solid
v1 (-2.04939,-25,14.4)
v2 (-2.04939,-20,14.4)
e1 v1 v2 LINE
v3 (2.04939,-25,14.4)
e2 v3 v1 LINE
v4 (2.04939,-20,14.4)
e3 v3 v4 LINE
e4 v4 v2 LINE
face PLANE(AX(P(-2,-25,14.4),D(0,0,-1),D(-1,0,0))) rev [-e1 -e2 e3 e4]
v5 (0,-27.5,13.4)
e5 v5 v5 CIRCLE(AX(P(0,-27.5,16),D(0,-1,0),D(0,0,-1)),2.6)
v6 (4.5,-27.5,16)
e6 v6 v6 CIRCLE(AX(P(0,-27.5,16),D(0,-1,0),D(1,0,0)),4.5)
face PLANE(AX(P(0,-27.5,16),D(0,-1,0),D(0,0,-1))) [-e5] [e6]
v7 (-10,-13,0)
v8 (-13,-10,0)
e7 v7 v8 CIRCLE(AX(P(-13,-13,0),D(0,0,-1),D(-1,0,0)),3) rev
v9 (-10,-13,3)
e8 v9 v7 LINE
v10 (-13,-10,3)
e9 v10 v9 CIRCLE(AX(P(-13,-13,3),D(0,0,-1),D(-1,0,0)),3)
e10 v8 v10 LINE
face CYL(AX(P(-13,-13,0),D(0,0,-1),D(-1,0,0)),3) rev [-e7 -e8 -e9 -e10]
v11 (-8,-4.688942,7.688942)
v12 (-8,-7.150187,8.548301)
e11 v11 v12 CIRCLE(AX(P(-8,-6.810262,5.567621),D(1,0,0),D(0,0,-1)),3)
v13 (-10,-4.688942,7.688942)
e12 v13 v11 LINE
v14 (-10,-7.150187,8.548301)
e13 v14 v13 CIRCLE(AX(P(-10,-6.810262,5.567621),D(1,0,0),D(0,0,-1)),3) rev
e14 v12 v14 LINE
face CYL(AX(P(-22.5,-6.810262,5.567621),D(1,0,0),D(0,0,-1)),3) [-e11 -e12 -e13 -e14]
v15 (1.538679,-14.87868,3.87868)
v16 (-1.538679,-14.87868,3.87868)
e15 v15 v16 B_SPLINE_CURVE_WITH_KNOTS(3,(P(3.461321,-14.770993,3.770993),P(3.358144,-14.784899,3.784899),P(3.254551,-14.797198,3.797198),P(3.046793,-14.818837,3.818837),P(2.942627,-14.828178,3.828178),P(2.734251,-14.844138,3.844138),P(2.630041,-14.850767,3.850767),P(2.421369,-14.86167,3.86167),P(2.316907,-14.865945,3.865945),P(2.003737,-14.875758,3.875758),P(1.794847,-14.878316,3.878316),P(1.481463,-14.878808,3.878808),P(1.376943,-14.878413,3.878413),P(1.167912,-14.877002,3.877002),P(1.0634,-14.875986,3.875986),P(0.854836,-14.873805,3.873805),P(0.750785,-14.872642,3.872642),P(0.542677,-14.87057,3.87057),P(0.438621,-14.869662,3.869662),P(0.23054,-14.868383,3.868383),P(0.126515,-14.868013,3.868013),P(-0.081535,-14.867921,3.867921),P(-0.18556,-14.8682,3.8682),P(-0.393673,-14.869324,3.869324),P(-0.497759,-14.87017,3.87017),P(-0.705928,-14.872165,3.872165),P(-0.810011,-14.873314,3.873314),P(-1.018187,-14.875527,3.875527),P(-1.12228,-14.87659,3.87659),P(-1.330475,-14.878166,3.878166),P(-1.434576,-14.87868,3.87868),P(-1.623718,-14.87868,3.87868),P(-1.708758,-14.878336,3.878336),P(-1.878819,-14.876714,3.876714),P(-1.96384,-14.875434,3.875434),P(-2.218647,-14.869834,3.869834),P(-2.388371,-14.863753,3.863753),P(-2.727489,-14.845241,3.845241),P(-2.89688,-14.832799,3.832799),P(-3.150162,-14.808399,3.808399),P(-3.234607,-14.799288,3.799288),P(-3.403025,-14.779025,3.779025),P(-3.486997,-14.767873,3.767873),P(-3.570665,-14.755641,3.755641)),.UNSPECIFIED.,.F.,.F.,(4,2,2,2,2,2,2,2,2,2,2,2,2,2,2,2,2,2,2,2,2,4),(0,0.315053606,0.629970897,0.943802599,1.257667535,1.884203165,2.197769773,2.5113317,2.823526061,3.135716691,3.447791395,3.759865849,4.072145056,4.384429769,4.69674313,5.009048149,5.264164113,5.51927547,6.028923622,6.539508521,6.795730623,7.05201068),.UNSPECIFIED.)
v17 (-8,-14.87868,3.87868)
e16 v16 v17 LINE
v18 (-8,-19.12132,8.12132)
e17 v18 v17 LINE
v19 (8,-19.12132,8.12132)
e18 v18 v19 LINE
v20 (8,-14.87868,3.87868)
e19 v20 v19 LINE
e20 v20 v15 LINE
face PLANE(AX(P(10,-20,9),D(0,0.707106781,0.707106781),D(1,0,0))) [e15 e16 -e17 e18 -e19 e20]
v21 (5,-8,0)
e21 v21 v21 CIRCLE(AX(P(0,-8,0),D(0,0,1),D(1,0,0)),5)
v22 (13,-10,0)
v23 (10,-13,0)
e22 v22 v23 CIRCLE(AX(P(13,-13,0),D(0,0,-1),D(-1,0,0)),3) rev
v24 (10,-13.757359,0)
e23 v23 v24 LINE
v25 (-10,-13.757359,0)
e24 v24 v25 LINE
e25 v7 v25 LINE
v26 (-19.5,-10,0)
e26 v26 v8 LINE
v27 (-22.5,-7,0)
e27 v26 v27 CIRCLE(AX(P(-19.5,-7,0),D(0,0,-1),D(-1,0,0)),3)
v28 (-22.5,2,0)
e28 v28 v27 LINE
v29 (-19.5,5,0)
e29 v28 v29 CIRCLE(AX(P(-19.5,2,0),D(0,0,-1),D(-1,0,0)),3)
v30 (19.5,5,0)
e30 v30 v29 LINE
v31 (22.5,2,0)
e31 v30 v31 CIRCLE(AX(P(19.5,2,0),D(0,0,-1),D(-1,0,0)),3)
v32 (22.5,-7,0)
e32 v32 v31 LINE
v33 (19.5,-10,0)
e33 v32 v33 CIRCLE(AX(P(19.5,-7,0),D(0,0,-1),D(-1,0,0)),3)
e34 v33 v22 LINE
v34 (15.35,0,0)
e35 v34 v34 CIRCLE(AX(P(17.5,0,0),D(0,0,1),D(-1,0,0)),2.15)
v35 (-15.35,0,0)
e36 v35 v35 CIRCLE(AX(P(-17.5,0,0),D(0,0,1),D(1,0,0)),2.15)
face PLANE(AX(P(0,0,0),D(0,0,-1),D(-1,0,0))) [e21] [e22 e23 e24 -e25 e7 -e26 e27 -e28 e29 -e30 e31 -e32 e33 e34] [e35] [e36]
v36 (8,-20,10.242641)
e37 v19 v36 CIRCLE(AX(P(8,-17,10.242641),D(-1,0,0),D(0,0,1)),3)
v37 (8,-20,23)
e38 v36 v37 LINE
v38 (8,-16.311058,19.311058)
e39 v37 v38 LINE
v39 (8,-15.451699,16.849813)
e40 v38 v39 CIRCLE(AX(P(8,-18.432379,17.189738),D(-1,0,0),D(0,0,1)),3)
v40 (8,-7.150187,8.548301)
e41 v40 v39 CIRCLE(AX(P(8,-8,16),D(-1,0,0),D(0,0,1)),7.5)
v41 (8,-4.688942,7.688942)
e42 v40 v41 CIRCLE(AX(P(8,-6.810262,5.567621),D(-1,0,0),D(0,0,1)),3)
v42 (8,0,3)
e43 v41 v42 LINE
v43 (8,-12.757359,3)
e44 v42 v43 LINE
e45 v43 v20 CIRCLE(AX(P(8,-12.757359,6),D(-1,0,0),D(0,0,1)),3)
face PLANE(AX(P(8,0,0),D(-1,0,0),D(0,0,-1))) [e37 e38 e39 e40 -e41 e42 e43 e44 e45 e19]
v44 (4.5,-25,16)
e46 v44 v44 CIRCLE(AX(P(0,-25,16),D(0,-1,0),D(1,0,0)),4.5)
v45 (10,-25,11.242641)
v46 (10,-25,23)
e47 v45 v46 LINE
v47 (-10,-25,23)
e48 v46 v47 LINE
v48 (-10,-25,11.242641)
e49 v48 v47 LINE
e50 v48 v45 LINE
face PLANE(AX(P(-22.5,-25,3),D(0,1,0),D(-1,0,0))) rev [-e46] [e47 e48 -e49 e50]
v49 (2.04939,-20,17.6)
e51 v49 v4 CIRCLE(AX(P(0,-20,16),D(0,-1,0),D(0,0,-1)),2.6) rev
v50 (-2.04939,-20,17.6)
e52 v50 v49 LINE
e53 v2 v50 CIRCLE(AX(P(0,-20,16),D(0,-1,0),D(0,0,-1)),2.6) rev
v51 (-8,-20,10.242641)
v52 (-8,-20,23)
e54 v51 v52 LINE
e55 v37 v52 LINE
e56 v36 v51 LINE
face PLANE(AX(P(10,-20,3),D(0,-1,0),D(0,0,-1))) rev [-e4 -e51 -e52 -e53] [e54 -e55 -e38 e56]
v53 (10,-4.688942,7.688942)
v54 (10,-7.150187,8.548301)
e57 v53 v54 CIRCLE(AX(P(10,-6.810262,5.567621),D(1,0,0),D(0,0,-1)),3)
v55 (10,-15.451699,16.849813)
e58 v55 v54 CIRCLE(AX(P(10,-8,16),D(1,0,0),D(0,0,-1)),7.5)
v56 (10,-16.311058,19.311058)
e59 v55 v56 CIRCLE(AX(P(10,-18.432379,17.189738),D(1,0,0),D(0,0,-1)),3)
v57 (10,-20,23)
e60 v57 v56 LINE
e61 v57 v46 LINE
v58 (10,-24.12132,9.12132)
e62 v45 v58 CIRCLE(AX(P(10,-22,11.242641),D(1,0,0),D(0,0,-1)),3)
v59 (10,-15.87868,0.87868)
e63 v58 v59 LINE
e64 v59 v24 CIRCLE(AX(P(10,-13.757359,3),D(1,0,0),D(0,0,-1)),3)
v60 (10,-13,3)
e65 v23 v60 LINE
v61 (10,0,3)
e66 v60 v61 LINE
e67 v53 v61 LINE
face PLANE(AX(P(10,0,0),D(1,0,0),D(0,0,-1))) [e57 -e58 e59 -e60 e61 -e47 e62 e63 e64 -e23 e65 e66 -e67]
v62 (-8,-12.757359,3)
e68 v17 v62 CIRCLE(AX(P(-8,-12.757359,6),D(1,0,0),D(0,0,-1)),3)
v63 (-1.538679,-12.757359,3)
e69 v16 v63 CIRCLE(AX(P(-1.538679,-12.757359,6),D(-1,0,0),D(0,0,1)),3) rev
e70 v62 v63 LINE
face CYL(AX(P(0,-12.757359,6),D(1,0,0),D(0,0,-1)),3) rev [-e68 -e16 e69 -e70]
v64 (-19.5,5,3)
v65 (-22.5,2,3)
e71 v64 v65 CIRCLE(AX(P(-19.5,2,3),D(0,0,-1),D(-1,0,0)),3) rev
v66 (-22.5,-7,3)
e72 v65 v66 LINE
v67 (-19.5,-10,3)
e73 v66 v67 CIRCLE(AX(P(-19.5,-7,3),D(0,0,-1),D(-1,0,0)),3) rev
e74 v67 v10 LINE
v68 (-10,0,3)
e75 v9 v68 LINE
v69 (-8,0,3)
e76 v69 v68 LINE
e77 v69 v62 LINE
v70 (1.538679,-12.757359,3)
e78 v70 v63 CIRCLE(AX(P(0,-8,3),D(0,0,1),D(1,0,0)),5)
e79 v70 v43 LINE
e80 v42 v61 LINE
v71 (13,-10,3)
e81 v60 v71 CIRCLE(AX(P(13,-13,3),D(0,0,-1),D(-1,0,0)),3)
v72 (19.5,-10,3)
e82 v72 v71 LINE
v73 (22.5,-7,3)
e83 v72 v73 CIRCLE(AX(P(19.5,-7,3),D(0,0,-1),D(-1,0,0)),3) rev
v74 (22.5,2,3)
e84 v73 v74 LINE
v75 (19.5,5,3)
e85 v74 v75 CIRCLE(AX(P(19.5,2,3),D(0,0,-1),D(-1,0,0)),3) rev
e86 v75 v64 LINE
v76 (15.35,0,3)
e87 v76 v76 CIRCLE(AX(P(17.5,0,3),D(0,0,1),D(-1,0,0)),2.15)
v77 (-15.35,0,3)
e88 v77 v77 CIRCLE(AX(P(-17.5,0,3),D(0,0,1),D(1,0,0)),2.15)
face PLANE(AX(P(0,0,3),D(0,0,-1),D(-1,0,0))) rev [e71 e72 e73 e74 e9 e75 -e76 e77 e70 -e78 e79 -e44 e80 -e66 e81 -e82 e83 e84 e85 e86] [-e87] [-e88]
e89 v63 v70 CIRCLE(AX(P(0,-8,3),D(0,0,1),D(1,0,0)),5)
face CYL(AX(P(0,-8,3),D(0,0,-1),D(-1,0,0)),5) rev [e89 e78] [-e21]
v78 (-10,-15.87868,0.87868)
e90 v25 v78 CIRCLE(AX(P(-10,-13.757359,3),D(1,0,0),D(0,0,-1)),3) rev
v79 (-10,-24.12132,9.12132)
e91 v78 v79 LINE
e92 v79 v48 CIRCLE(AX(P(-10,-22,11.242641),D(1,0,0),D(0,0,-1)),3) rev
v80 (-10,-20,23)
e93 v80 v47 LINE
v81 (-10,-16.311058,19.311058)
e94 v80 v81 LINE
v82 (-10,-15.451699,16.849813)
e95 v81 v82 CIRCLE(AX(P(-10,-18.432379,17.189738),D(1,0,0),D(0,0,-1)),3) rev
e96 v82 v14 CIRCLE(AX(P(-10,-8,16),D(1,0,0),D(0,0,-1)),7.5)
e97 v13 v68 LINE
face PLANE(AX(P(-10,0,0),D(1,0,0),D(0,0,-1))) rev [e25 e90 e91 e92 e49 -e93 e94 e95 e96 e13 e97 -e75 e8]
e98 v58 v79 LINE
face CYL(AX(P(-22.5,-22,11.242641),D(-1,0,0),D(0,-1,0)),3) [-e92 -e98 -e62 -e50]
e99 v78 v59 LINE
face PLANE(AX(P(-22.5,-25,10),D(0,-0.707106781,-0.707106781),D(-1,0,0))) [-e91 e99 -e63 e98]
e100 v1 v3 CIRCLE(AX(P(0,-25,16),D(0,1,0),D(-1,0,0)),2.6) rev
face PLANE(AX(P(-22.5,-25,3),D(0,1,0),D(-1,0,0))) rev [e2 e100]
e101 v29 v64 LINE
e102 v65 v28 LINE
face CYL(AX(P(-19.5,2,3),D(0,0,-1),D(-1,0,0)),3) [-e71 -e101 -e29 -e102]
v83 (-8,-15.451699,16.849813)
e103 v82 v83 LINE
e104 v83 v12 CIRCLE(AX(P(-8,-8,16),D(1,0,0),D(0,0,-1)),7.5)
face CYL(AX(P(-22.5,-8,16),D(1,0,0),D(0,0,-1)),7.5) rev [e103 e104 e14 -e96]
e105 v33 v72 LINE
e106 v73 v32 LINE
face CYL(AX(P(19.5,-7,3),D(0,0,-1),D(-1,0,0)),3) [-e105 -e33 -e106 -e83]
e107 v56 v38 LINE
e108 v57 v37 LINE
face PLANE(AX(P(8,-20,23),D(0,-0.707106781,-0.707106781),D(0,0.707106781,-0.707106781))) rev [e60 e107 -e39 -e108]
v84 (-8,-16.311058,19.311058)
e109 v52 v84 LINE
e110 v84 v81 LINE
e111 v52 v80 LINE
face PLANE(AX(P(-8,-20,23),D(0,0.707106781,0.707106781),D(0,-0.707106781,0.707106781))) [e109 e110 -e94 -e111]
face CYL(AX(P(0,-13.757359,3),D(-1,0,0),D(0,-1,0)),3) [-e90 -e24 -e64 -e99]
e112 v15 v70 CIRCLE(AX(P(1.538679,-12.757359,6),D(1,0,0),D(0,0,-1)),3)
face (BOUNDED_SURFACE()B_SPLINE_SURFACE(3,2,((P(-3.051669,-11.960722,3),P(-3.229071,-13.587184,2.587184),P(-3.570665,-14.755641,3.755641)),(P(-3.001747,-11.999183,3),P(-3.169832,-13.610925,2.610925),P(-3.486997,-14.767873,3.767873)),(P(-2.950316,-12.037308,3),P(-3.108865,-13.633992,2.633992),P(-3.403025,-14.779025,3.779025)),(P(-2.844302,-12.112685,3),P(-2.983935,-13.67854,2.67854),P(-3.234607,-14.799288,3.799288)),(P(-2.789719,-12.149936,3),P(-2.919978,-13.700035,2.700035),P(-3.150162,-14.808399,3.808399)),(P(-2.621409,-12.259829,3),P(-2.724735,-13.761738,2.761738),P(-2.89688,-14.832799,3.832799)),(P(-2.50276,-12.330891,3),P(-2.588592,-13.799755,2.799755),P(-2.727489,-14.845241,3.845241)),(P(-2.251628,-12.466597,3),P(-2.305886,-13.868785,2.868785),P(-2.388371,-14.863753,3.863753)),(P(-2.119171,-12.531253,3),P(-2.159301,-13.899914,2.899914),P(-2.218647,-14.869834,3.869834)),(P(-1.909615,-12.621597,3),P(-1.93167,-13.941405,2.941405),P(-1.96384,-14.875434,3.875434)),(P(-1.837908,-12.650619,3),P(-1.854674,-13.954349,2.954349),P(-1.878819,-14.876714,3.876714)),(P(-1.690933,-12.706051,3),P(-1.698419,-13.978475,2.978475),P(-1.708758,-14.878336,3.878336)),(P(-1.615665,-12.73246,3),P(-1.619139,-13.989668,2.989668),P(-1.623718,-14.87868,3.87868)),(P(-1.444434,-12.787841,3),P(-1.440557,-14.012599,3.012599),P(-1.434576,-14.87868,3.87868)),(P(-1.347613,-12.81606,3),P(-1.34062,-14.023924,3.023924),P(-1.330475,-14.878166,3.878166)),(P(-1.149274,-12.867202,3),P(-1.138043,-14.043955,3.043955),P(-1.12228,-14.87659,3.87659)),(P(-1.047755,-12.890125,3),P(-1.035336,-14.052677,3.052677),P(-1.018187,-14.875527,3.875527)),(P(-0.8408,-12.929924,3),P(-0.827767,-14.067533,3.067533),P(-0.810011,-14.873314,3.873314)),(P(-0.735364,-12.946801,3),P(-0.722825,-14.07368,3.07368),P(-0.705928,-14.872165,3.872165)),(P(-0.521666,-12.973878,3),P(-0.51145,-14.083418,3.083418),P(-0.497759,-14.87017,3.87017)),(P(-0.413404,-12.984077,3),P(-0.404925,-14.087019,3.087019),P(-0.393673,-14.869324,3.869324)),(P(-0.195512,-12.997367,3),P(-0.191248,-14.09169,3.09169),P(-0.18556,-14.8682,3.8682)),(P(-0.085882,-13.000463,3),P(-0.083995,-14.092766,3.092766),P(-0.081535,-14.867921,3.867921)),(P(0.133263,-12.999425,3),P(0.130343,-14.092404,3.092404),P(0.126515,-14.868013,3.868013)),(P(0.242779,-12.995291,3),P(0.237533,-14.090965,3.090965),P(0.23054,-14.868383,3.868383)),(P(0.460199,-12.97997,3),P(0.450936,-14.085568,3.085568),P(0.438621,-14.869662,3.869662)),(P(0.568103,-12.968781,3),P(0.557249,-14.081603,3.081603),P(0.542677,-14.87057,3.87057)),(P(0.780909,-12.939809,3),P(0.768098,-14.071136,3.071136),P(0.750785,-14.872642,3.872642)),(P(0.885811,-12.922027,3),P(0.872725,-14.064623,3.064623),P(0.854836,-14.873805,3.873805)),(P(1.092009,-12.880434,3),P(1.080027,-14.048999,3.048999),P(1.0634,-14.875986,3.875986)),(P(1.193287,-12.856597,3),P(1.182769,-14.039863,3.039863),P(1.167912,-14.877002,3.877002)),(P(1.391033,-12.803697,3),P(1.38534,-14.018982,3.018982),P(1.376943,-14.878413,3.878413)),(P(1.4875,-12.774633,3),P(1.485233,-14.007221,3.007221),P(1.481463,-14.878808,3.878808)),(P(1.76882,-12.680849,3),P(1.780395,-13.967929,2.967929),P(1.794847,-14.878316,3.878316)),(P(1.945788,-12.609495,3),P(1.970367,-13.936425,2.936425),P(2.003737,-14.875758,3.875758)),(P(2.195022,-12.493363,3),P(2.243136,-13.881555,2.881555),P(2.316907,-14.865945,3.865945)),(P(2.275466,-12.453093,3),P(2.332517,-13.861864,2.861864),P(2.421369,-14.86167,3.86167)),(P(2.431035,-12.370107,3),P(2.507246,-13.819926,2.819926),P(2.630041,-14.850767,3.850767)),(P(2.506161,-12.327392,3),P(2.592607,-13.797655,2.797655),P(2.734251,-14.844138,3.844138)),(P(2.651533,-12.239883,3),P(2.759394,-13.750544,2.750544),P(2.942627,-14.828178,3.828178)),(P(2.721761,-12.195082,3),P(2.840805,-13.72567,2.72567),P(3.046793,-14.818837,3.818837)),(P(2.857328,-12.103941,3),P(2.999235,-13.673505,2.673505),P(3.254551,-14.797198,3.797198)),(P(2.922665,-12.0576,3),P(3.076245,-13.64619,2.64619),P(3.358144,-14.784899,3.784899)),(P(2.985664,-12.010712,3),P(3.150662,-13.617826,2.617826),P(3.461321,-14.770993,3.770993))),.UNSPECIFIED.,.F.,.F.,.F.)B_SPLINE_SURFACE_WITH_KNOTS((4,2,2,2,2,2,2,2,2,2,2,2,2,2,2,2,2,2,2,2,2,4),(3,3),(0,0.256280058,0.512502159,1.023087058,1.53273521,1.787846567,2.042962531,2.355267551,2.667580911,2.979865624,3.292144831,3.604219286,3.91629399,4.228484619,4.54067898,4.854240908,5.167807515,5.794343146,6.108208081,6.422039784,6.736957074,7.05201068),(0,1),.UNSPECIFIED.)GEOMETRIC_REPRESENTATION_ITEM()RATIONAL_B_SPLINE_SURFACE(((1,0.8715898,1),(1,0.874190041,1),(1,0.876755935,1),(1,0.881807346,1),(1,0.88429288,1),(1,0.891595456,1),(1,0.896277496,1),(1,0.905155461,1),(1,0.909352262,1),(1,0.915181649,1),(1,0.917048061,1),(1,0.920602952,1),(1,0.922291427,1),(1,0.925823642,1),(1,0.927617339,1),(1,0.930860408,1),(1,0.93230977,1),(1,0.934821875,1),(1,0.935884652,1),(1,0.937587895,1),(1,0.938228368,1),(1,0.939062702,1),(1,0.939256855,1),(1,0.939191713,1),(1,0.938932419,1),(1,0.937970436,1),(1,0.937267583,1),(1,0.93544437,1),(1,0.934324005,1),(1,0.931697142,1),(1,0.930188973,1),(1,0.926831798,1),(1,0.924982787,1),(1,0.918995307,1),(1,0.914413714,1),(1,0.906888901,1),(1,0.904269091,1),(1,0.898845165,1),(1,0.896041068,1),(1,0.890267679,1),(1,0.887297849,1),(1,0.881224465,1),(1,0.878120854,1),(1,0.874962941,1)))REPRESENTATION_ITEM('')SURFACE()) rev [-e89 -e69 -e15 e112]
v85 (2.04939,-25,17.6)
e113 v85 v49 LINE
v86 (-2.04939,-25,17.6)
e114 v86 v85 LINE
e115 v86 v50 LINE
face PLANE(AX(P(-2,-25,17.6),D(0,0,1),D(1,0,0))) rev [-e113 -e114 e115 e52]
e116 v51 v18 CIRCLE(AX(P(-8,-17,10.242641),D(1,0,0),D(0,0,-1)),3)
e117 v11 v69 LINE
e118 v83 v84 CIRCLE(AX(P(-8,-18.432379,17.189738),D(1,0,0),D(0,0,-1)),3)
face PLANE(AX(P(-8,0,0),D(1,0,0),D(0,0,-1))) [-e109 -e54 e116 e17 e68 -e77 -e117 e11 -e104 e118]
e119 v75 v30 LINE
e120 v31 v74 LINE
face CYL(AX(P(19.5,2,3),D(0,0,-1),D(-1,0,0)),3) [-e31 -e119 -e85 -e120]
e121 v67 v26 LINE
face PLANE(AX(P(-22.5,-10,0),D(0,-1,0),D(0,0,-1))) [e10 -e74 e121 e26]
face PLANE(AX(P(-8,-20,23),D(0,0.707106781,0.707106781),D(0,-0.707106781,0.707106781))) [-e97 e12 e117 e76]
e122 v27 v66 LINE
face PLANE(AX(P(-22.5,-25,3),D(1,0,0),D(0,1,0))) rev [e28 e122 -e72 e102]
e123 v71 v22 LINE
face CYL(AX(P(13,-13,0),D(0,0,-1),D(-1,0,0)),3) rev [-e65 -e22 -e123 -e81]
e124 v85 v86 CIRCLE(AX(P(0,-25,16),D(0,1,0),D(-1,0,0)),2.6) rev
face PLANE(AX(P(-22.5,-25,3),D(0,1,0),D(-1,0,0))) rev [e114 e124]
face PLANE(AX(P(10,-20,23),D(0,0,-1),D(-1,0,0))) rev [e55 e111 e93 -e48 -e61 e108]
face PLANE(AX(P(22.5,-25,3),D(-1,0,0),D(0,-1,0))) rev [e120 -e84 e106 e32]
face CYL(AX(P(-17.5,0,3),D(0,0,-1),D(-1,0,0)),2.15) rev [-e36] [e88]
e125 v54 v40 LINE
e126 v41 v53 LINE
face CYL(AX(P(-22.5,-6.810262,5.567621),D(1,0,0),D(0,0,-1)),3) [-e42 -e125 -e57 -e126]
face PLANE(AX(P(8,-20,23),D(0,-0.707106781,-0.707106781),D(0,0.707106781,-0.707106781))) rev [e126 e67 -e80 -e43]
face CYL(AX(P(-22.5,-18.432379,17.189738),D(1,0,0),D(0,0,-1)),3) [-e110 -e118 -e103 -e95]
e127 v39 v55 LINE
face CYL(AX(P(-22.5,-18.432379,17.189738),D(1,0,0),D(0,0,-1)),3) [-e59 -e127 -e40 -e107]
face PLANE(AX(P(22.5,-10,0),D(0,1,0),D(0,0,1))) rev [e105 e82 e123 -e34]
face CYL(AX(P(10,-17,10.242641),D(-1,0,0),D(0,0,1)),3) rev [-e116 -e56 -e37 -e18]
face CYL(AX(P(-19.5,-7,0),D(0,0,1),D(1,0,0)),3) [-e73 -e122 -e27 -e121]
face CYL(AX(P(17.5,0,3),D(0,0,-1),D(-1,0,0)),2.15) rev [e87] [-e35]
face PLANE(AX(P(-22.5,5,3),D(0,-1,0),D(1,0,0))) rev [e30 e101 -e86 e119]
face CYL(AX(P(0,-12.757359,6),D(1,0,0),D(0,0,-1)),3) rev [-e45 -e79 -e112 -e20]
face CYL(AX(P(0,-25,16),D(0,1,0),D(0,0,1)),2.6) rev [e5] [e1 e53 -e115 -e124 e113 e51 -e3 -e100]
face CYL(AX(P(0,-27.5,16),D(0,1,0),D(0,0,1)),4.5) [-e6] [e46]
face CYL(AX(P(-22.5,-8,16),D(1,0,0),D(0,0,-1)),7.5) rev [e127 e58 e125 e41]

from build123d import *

# Parameters (mm, degrees)
SKETCH1_W               = 45
SKETCH1_H               = 30
SKETCH1_R               = 2.15
SKETCH1_R_2             = 5
BOSS_EXTRUDE1_DEPTH     = 3
SKETCH3_W               = 20
SKETCH3_H               = 5
EXTRUDE_THIN1_DEPTH     = 10
CUT_EXTRUDE1_DEPTH      = 41.746165464
BOSS_EXTRUDE2_DEPTH     = 2
SKETCH6_W               = 3
SKETCH6_H               = 15
CUT_EXTRUDE2_DEPTH      = 48.013295992
CHAMFER2_SIZE           = 6
CHAMFER1_SIZE           = 10
SKETCH8_R               = 4.5
SKETCH8_R_2             = 2.5
EXTRUDE_THIN3_DEPTH     = 2.5
MOVE_START              = -27.5
MOVE_FACE1_DEPTH        = 7.5
MOVE_FACE1_2_DEPTH      = 2.5
CUT_EXTRUDE3_DEPTH      = 43.32611487
CUT_EXTRUDE3_DEPTH_BACK = 43.32611487
SKETCH11_R              = 7.5
FILLET1_R               = 3


# Read off the part's stored shape, not the designer's step: Move Face1
with BuildPart() as part:
    # Sketch1 → Boss-Extrude1 (new body)
    with BuildSketch(Plane.XY):
        with Locations((0, -10)):
            Rectangle(SKETCH1_W, SKETCH1_H)
        with Locations((-17.5, 0)):
            Circle(SKETCH1_R, mode=Mode.SUBTRACT)
        with Locations(Location((17.5, 0, 0), (0, 0, 180))):
            Circle(SKETCH1_R, mode=Mode.SUBTRACT)
        with Locations((0, -8)):
            Circle(SKETCH1_R_2, mode=Mode.SUBTRACT)
    extrude(amount=BOSS_EXTRUDE1_DEPTH)

    # Sketch3 → Extrude-Thin1 (add, symmetric)
    with BuildSketch(Plane.ZY):
        with Locations((13, -22.5)):
            Rectangle(SKETCH3_W, SKETCH3_H)
    extrude(amount=EXTRUDE_THIN1_DEPTH, both=True)

    # Sketch4 → Cut-Extrude1 (cut, through all)
    with BuildSketch(Plane(origin=(0, -20, 0), x_dir=(1, 0, 0), z_dir=(0, 1, 0))):
        with BuildLine():
            Line((-2, -14.5), (2, -14.5))
            ThreePointArc((2, -14.5), (2.5, -16), (2, -17.5))
            Line((2, -17.5), (-2, -17.5))
            ThreePointArc((-2, -17.5), (-2.5, -16), (-2, -14.5))
        make_face()
    extrude(amount=-CUT_EXTRUDE1_DEPTH, mode=Mode.SUBTRACT)

    # Sketch5 → Boss-Extrude2 (add)
    with BuildSketch(Plane.ZY.offset(10)):
        Polygon((23, -20), (3, 0), (3, -20), align=None)
    boss_extrude2 = extrude(amount=-BOSS_EXTRUDE2_DEPTH)

    # Sketch6 → Cut-Extrude2 (cut, through all)
    with BuildSketch(Plane.ZY.offset(10)):
        with Locations((1.5, -17.5)):
            Rectangle(SKETCH6_W, SKETCH6_H)
    cut_extrude2 = extrude(amount=CUT_EXTRUDE2_DEPTH, mode=Mode.SUBTRACT)

    # Mirror1: Boss-Extrude2, Cut-Extrude2 across plane
    add(boss_extrude2.mirror(Plane(origin=(0, 0, 0), x_dir=(0, 0, 1), z_dir=(1, 0, 0))))
    add(cut_extrude2.mirror(Plane(origin=(0, 0, 0), x_dir=(0, 0, 1), z_dir=(1, 0, 0))), mode=Mode.SUBTRACT)

    # Chamfer2
    chamfer2_edges = [part.edges().sort_by_distance(p)[0] for p in [
        (0, -20, 3),
    ]]
    chamfer(chamfer2_edges, length=CHAMFER2_SIZE)

    # Chamfer1
    chamfer1_edges = [part.edges().sort_by_distance(p)[0] for p in [
        (0, -25, 0),
    ]]
    chamfer(chamfer1_edges, length=CHAMFER1_SIZE)

    # Sketch8 → Extrude-Thin3 (add)
    with BuildSketch(Plane.XZ.offset(25)):
        with Locations((0, 16)):
            Circle(SKETCH8_R)
        with Locations((0, 16)):
            Circle(SKETCH8_R_2, mode=Mode.SUBTRACT)
    extrude(amount=EXTRUDE_THIN3_DEPTH)

    # Move Face1 outline → Move Face1 (cut)
    with BuildSketch(Plane(origin=(0, 0, 0), x_dir=(1, 0, 0), z_dir=(0, 1, 0)).offset(MOVE_START)):
        with BuildLine():
            ThreePointArc((2.049390153, -17.6), (2.6, -16), (2.049390153, -14.4))
            Line((2.049390153, -14.4), (-2.049390153, -14.4))
            ThreePointArc((-2.049390153, -14.4), (-2.6, -16), (-2.049390153, -17.6))
            Line((-2.049390153, -17.6), (2.049390153, -17.6))
        make_face()
        with BuildLine():
            Line((2, -17.5), (-2, -17.5))
            ThreePointArc((-2, -17.5), (-2.5, -16), (-2, -14.5))
            Line((-2, -14.5), (2, -14.5))
            ThreePointArc((2, -14.5), (2.5, -16), (2, -17.5))
        make_face(mode=Mode.SUBTRACT)
    extrude(amount=MOVE_FACE1_DEPTH, mode=Mode.SUBTRACT)

    # Move Face1 2 outline → Move Face1 2 (cut)
    with BuildSketch(Plane(origin=(0, 0, 0), x_dir=(1, 0, 0), z_dir=(0, 1, 0)).offset(MOVE_START)):
        with BuildLine():
            Line((1.920937271, -14.4), (2.049390153, -14.4))
            ThreePointArc((2.049390153, -14.4), (0, -13.4), (-2.049390153, -14.4))
            Line((-2.049390153, -14.4), (-1.920937271, -14.4))
            ThreePointArc((-1.920937271, -14.4), (0, -13.5), (1.920937271, -14.4))
        make_face()
        with BuildLine():
            ThreePointArc((-2.049390153, -17.6), (0, -18.6), (2.049390153, -17.6))
            Line((2.049390153, -17.6), (1.920937271, -17.6))
            ThreePointArc((1.920937271, -17.6), (0, -18.5), (-1.920937271, -17.6))
            Line((-1.920937271, -17.6), (-2.049390153, -17.6))
        make_face()
    extrude(amount=MOVE_FACE1_2_DEPTH, mode=Mode.SUBTRACT)

    # Sketch11 → Cut-Extrude3 (cut, two sides: drawn at the far end of the back side and taken through both)
    with BuildSketch(Plane(origin=(0, 0, 0), x_dir=(0, 0, -1), z_dir=(1, 0, 0)).offset(-CUT_EXTRUDE3_DEPTH_BACK)):
        with Locations((-16, -8)):
            Circle(SKETCH11_R)
    extrude(amount=CUT_EXTRUDE3_DEPTH + CUT_EXTRUDE3_DEPTH_BACK, mode=Mode.SUBTRACT)

    # Fillet1
    fillet1_edges = [part.edges().sort_by_distance(p)[0] for p in [
        (0, -20, 9),
        (0, -14, 3),
        (0, -25, 10),
        (0, -15, 0),
        (-9, -15.177071733, 18.177071733),
        (-9, -5.822928267, 8.822928267),
        (9, -15.177071733, 18.177071733),
        (9, -5.822928267, 8.822928267),
        (-10, -10, 1.5),
        (-22.5, -10, 1.5),
        (-22.5, 5, 1.5),
        (22.5, 5, 1.5),
        (22.5, -10, 1.5),
        (10, -10, 1.5),
    ]]
    fillet(fillet1_edges, radius=FILLET1_R)


solid = part.part
